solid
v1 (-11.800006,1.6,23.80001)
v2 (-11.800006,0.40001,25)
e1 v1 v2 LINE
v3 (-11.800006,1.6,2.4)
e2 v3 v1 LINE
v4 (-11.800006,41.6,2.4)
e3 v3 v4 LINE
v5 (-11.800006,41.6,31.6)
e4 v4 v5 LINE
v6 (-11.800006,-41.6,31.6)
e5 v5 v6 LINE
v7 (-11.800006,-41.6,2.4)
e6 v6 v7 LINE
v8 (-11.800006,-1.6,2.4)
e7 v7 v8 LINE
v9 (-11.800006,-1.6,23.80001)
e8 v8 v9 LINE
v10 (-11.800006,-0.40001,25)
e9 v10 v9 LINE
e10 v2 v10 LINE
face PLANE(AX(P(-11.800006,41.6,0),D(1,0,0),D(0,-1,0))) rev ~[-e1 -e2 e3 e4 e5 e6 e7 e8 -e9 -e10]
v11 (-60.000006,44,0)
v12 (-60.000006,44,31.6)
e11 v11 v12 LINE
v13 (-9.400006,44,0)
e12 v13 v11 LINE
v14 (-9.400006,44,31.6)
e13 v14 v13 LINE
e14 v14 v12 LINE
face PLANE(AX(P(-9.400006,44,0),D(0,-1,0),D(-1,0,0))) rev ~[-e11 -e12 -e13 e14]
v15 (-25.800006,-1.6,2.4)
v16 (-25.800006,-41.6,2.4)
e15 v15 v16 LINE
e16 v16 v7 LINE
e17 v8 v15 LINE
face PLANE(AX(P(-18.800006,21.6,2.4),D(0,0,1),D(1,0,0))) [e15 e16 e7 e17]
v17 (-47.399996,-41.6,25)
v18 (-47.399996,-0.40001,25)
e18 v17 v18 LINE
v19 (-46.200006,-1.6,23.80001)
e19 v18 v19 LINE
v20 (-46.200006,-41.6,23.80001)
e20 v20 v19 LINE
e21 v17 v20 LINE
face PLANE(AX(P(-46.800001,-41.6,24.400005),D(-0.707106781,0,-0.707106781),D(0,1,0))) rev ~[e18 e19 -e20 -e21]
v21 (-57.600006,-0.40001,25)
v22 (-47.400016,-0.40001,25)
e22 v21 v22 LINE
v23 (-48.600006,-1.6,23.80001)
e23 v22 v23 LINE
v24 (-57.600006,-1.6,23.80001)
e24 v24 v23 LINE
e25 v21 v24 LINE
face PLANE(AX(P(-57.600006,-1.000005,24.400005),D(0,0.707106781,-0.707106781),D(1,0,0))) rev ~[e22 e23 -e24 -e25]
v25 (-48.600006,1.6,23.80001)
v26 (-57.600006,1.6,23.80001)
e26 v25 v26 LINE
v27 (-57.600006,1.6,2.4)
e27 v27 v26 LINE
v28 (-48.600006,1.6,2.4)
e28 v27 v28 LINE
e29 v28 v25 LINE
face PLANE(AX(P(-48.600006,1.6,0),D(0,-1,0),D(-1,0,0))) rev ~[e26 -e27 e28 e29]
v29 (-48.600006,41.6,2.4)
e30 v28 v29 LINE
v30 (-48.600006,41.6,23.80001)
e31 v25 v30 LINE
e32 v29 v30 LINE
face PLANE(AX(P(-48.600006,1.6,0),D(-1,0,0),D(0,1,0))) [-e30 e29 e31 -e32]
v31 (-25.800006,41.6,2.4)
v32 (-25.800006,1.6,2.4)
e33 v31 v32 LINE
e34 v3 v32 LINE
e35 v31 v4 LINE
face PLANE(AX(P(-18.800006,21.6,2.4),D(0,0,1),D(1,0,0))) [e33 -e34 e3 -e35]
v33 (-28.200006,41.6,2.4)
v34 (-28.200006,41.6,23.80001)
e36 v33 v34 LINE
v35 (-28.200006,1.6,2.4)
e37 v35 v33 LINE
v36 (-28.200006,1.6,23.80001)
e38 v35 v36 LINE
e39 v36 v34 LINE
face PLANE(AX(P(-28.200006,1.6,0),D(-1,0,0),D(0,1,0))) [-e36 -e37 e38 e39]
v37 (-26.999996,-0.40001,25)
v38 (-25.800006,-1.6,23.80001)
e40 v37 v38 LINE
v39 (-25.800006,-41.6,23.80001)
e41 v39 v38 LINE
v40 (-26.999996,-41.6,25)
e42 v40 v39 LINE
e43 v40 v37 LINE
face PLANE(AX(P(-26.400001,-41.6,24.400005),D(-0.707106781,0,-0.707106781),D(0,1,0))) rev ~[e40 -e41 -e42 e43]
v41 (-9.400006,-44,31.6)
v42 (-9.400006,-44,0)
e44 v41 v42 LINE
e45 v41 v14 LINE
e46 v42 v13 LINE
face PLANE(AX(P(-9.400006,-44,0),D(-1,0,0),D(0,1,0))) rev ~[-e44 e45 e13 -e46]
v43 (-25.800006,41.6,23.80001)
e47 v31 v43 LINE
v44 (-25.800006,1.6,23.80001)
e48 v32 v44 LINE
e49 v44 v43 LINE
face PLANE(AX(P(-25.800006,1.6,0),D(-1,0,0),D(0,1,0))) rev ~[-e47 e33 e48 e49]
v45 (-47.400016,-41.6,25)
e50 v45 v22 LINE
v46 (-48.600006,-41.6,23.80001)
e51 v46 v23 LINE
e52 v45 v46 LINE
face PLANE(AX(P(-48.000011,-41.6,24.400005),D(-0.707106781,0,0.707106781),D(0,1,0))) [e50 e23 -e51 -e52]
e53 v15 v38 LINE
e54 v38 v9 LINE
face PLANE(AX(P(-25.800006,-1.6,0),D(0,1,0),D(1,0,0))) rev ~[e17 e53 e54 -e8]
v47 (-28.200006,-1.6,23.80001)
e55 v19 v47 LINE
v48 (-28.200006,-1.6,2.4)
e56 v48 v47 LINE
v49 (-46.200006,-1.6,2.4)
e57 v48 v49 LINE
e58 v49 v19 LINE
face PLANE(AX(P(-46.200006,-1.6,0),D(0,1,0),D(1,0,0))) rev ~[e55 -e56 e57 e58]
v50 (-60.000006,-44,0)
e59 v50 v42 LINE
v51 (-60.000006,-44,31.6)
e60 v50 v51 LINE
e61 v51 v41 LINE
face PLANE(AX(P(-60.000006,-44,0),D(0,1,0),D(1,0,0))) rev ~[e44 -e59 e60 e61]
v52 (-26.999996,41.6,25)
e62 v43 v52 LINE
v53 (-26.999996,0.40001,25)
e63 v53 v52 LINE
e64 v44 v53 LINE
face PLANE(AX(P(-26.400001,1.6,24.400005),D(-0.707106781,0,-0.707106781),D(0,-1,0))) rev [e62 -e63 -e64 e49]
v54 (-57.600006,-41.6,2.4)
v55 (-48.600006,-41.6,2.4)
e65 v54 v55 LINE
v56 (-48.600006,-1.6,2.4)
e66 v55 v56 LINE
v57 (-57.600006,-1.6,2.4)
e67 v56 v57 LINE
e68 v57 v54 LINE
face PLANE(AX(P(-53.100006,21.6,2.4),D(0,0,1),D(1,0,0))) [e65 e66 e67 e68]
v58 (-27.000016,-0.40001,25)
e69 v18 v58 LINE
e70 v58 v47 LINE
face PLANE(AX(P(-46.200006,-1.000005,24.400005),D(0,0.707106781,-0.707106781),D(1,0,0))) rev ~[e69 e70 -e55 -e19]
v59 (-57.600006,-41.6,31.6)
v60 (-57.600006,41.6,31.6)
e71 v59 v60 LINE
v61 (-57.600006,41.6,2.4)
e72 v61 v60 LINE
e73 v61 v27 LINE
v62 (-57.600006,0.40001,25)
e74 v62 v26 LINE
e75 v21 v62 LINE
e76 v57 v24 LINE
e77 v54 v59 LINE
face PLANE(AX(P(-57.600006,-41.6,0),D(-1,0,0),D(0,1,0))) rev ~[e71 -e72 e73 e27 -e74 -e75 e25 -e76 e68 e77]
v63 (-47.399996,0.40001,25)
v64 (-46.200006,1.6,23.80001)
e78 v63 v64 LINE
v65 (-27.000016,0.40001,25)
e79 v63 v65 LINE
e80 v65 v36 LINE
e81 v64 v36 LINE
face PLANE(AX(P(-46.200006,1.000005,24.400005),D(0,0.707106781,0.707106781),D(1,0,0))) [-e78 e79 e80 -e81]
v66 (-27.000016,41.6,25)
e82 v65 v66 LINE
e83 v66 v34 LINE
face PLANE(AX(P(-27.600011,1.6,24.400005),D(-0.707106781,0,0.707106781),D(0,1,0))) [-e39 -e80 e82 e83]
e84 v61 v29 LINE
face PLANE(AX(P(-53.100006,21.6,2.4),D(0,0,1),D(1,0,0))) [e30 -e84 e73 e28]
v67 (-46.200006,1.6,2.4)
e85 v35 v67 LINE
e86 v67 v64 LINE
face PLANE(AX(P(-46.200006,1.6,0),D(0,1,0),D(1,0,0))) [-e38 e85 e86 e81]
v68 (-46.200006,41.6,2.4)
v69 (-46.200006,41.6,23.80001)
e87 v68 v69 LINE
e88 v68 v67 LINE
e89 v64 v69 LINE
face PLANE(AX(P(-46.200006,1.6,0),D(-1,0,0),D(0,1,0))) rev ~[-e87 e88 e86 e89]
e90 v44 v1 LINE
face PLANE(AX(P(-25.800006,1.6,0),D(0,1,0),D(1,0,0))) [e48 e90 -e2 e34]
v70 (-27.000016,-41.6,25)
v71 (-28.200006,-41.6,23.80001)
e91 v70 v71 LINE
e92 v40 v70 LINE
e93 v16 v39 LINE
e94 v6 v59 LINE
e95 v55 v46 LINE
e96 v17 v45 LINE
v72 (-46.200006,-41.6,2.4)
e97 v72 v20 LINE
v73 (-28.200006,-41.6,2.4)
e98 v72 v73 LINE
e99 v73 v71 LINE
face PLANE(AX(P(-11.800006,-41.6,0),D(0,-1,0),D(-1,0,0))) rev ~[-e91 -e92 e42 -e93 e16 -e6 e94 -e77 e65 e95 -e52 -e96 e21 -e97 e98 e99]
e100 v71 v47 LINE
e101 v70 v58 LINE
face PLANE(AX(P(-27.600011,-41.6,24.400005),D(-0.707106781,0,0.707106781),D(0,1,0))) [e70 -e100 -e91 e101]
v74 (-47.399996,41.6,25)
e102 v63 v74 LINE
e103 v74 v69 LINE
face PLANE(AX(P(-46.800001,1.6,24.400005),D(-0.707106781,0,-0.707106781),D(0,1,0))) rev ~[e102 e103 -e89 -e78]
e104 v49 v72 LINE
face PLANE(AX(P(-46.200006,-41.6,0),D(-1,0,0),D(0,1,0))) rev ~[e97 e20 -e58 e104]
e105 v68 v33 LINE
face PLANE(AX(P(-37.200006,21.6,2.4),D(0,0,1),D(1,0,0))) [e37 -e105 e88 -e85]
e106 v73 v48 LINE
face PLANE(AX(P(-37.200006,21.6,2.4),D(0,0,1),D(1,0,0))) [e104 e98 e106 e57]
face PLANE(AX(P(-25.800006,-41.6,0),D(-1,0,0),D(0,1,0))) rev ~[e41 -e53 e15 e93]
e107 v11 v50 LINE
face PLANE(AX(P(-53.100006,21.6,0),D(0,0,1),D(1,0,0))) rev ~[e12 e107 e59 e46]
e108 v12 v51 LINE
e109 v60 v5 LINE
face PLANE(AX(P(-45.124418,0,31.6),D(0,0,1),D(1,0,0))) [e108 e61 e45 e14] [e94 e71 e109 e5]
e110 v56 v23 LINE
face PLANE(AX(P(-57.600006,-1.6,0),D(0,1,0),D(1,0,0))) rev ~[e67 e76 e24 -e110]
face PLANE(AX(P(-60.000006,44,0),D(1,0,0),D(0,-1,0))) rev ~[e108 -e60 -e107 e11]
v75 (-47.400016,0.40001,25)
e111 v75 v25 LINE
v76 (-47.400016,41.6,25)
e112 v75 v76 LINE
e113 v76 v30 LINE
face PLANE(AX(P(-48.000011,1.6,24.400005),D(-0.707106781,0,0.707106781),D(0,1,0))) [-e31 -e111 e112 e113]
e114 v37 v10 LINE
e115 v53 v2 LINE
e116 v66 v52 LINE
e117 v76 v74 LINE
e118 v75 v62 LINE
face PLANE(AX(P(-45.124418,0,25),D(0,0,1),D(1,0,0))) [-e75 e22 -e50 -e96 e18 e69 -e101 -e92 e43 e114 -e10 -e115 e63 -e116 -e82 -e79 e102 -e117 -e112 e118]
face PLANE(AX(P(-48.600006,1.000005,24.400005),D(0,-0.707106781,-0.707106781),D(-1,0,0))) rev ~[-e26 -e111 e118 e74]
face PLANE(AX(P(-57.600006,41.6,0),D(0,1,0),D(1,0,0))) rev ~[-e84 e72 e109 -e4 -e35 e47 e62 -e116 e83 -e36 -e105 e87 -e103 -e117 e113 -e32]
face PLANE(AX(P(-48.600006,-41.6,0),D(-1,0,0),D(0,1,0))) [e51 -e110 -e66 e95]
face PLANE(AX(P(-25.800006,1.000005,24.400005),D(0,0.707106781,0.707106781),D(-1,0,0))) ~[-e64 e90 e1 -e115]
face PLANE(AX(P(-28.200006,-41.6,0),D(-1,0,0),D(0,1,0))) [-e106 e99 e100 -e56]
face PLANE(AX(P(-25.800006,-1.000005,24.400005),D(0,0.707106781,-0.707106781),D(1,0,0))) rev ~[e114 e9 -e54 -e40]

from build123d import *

# Parameters (mm, degrees)
F0_W     = 2.4
F0_H     = 40
F0_H_2   = 3.2
F1_DEPTH = 31.6
F0_W_2   = 9
F0_W_3   = 18
F0_W_4   = 14
F2_DEPTH = 2.4
F3_DEPTH = 25
F4_SIZE  = 1.19999


# Not quite as in the source:
# - a fillet or chamfer is up to 0.001 mm smaller than in the source, because OpenCascade refuses the exact size


with BuildPart() as f1:
    # F0 (on Top) → F1 (new body)
    with BuildSketch(Plane.XY):
        Polygon((-9.4000064151, 44), (-60.0000064151, 44), (-60.0000064151, -44), (-9.4000064151, -44), (-9.4000064151, -41.6), (-11.8000064151, -41.6), (-25.8000064151, -41.6), (-28.2000064151, -41.6), (-46.2000064151, -41.6), (-48.6000064151, -41.6), (-57.6000064151, -41.6), (-57.6000064151, -1.6), (-57.6000064151, 1.6), (-57.6000064151, 41.6), (-48.6000064151, 41.6), (-46.2000064151, 41.6), (-28.2000064151, 41.6), (-25.8000064151, 41.6), (-11.8000064151, 41.6), (-9.4000064151, 41.6), align=None)
        with Locations((-10.6000064151, 21.6)):
            Rectangle(F0_W, F0_H)
        with Locations((-10.6000064151, 0)):
            Rectangle(F0_W, F0_H_2)
        with Locations((-10.6000064151, -21.6)):
            Rectangle(F0_W, F0_H)
    extrude(amount=F1_DEPTH)

    # F0 (on Top) → F2 (join)
    with BuildSketch(Plane.XY):
        with Locations((-53.1000064151, 21.6)):
            Rectangle(F0_W_2, F0_H)
        with Locations((-53.1000064151, 0)):
            Rectangle(F0_W_2, F0_H_2)
        with Locations((-53.1000064151, -21.6)):
            Rectangle(F0_W_2, F0_H)
        with Locations((-37.2000064151, 21.6)):
            Rectangle(F0_W_3, F0_H)
        with Locations((-37.2000064151, 0)):
            Rectangle(F0_W_3, F0_H_2)
        with Locations((-37.2000064151, -21.6)):
            Rectangle(F0_W_3, F0_H)
        with Locations((-18.8000064151, 21.6)):
            Rectangle(F0_W_4, F0_H)
        with Locations((-18.8000064151, 0)):
            Rectangle(F0_W_4, F0_H_2)
        with Locations((-18.8000064151, -21.6)):
            Rectangle(F0_W_4, F0_H)
    extrude(amount=F2_DEPTH)

    # F0 (on Top) → F3 (join)
    with BuildSketch(Plane.XY):
        Polygon((-9.4000064151, 44), (-60.0000064151, 44), (-60.0000064151, -44), (-9.4000064151, -44), (-9.4000064151, -41.6), (-11.8000064151, -41.6), (-25.8000064151, -41.6), (-28.2000064151, -41.6), (-46.2000064151, -41.6), (-48.6000064151, -41.6), (-57.6000064151, -41.6), (-57.6000064151, -1.6), (-57.6000064151, 1.6), (-57.6000064151, 41.6), (-48.6000064151, 41.6), (-46.2000064151, 41.6), (-28.2000064151, 41.6), (-25.8000064151, 41.6), (-11.8000064151, 41.6), (-9.4000064151, 41.6), align=None)
        with Locations((-10.6000064151, 21.6)):
            Rectangle(F0_W, F0_H)
        with Locations((-10.6000064151, -21.6)):
            Rectangle(F0_W, F0_H)
        with Locations((-10.6000064151, 0)):
            Rectangle(F0_W, F0_H_2)
        with Locations((-53.1000064151, 0)):
            Rectangle(F0_W_2, F0_H_2)
        with Locations((-47.4000064151, 0)):
            Rectangle(F0_W, F0_H_2)
        with Locations((-47.4000064151, 21.6)):
            Rectangle(F0_W, F0_H)
        with Locations((-47.4000064151, -21.6)):
            Rectangle(F0_W, F0_H)
        with Locations((-37.2000064151, 0)):
            Rectangle(F0_W_3, F0_H_2)
        with Locations((-27.0000064151, 21.6)):
            Rectangle(F0_W, F0_H)
        with Locations((-27.0000064151, 0)):
            Rectangle(F0_W, F0_H_2)
        with Locations((-18.8000064151, 0)):
            Rectangle(F0_W_4, F0_H_2)
        with Locations((-27.0000064151, -21.6)):
            Rectangle(F0_W, F0_H)
    extrude(amount=F3_DEPTH)

    # F4 (size 1.2 in the source; OpenCascade refuses exactly that, so slightly less here)
    f4_edges = [f1.edges().sort_by_distance(p)[0] for p in [
        (-53.100006, 1.6, 25),
        (-53.100006, -1.6, 25),
        (-46.200006, -21.6, 25),
        (-48.600006, -21.6, 25),
        (-48.600006, 21.6, 25),
        (-46.200006, 21.6, 25),
        (-37.200006, 1.6, 25),
        (-37.200006, -1.6, 25),
        (-28.200006, -21.6, 25),
        (-25.800006, -21.6, 25),
        (-18.800006, -1.6, 25),
        (-18.800006, 1.6, 25),
        (-25.800006, 21.6, 25),
        (-28.200006, 21.6, 25),
    ]]
    chamfer(f4_edges, length=F4_SIZE)


solid = f1.part
